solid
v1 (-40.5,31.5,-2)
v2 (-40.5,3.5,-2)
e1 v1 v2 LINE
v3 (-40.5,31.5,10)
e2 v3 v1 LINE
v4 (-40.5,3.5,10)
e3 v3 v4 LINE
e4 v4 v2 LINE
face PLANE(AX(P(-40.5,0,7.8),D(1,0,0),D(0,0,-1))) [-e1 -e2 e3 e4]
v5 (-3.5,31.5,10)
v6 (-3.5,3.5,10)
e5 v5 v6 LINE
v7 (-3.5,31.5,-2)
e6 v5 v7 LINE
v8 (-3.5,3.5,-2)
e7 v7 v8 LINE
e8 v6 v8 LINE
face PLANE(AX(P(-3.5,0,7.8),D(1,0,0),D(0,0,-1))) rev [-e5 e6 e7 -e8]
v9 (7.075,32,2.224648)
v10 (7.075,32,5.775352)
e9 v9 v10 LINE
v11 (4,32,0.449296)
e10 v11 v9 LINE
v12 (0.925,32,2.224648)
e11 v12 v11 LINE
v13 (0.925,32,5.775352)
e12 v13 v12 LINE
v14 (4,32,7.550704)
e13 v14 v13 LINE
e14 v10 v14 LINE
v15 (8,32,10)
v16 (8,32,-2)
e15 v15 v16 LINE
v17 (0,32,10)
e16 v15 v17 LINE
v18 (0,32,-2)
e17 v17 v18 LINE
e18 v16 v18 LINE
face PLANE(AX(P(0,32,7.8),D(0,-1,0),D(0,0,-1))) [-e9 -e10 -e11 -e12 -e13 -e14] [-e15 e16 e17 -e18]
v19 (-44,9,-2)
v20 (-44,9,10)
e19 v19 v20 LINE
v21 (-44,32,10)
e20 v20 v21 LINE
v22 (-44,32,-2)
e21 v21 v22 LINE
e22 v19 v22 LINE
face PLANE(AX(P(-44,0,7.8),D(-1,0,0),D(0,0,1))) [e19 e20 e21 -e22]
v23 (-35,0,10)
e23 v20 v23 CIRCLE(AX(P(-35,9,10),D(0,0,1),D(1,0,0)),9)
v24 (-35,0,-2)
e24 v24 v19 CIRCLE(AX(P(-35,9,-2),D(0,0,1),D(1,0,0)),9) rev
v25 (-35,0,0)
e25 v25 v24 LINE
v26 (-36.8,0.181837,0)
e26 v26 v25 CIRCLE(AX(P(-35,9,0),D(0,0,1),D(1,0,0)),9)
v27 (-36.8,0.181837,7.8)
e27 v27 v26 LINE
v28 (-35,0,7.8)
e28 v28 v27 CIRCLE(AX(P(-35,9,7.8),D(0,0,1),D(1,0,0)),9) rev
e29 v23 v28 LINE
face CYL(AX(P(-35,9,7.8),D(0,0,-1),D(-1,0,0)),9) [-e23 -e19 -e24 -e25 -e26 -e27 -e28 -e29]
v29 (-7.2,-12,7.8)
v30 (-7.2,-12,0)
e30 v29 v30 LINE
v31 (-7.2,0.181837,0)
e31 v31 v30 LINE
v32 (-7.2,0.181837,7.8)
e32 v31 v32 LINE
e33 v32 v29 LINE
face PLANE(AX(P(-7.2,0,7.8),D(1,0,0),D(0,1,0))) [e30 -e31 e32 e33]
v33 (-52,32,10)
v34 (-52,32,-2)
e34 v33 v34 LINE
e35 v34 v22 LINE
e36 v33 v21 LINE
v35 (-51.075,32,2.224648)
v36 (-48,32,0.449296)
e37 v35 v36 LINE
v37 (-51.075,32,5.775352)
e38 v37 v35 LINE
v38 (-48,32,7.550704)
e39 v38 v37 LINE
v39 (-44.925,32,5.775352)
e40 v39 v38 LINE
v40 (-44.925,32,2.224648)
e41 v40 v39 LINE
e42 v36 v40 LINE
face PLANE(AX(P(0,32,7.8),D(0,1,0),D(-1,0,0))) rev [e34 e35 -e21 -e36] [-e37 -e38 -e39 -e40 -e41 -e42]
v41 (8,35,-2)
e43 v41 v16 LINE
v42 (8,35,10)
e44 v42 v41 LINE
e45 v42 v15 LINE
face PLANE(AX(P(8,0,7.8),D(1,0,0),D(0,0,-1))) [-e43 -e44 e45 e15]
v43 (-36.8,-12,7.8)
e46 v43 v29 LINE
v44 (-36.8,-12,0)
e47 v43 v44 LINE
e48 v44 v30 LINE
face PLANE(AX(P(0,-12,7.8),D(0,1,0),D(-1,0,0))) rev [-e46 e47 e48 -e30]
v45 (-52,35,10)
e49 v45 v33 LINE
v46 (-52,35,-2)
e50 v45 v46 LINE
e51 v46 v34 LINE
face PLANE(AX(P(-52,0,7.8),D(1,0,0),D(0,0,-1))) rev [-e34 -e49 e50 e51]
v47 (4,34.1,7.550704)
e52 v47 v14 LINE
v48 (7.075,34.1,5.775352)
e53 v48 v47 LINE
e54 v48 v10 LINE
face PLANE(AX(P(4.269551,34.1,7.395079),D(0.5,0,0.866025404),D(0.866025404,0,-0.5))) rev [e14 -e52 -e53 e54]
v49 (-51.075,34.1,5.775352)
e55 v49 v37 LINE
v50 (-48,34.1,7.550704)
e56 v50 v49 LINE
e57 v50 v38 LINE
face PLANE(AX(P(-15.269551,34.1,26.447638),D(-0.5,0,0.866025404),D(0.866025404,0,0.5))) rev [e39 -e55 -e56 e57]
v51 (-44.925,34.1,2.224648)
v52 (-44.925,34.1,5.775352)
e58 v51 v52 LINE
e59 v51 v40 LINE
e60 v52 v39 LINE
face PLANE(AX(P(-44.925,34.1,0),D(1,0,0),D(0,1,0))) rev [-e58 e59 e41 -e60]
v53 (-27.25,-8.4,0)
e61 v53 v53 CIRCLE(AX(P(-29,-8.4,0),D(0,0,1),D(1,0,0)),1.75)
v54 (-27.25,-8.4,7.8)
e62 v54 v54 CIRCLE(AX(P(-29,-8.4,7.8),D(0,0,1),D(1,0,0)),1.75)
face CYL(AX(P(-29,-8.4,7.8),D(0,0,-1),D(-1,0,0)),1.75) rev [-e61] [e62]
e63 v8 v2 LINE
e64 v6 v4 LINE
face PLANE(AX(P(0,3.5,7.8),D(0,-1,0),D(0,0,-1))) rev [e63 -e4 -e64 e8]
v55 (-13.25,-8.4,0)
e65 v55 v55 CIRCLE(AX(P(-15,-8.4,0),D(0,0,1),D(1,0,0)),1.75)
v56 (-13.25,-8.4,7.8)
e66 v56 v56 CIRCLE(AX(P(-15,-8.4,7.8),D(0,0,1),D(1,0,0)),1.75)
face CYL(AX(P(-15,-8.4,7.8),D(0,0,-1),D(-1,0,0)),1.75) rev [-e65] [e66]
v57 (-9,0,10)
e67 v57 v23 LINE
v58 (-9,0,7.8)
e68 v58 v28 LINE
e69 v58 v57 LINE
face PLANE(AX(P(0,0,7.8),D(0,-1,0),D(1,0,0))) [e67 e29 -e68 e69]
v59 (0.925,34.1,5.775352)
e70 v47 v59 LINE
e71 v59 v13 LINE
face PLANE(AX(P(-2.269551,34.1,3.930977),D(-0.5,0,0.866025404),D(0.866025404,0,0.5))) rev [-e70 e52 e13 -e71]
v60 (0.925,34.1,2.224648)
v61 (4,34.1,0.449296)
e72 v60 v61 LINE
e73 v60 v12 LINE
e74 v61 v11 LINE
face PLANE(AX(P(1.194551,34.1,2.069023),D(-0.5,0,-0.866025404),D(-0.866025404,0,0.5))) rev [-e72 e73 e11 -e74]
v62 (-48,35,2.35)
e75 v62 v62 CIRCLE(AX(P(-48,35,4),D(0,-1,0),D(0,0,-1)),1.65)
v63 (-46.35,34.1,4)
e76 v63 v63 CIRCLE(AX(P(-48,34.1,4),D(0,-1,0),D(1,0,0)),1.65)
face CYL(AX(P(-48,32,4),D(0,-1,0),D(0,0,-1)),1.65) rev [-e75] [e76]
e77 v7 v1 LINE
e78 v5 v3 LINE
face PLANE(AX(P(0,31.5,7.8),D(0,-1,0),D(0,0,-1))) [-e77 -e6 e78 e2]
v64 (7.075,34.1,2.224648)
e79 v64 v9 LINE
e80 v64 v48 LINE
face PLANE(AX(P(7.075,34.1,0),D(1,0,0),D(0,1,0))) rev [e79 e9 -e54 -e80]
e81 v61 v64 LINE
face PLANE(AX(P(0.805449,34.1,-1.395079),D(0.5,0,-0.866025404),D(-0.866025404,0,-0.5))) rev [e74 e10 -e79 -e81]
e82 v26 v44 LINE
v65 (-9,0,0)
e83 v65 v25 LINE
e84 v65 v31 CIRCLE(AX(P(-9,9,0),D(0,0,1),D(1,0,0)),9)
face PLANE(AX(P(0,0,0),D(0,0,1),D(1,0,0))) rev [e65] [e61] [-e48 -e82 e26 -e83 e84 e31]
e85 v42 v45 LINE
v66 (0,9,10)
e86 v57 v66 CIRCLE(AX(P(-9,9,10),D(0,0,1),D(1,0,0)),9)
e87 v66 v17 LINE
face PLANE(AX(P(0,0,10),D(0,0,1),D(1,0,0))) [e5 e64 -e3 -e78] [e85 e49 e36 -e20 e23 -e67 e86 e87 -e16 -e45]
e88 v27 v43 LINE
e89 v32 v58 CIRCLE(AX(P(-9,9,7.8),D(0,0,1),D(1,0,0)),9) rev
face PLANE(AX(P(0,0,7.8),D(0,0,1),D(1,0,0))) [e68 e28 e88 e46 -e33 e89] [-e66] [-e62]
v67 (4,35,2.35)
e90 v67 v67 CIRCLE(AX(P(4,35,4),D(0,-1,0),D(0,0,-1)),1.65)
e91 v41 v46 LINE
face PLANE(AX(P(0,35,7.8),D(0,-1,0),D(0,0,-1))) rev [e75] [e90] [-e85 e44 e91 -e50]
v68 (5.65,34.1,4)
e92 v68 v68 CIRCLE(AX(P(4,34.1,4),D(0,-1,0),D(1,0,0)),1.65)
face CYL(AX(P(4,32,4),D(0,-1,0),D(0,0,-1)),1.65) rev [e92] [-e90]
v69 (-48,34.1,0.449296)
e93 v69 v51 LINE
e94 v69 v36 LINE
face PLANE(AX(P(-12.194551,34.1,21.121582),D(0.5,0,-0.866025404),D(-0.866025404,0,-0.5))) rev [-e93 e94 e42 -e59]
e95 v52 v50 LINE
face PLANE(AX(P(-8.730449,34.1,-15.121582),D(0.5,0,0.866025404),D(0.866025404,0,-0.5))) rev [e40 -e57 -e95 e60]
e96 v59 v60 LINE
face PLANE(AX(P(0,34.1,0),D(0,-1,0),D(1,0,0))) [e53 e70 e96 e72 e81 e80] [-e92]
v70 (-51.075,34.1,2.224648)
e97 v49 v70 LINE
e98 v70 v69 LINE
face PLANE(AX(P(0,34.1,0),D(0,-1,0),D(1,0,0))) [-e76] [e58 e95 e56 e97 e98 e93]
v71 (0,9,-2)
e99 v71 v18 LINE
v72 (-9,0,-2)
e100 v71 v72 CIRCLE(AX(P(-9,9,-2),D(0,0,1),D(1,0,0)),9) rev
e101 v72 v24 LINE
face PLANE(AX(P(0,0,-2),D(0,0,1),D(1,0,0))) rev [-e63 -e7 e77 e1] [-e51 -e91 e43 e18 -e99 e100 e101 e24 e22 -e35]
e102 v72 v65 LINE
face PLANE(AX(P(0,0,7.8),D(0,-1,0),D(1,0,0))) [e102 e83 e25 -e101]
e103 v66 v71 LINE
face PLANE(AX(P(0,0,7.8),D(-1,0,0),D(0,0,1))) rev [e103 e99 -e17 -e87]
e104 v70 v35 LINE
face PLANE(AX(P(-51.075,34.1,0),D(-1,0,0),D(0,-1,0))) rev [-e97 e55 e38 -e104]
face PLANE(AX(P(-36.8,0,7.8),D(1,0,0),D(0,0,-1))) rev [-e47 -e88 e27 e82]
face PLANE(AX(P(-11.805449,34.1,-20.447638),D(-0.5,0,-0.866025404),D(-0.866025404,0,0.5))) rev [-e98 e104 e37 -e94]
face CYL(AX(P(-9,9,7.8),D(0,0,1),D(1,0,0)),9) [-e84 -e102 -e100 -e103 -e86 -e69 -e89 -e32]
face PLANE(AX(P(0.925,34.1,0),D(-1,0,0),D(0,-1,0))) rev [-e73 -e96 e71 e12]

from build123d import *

# Parameters (mm, degrees)
SKETCH1_W                = 37
SKETCH1_H                = 28
SKETCH1_R                = 1.75
BOSS_EXTRUDE1_DEPTH      = 7.8
BOSS_EXTRUDE2_DEPTH      = 10
BOSS_EXTRUDE2_DEPTH_BACK = 2
SKETCH1_3_W              = 44
SKETCH1_3_H              = 35
SKETCH1_3_W_2            = 37
SKETCH1_3_H_2            = 28
SKETCH1_3_W_3            = 8
SKETCH1_3_H_3            = 3
FILLET1_R                = 9
CUT_EXTRUDE1_DEPTH       = 2.1
HOLE1_D                  = 3.3


with BuildPart() as part:
    # Sketch1 → Boss-Extrude1 (new body)
    with BuildSketch(Plane.XY):
        Polygon((-7.2, 0), (0, 0), (0, 32), (8, 32), (8, 35), (-52, 35), (-52, 32), (-44, 32), (-44, 0), (-36.8, 0), (-36.8, -12), (-7.2, -12), align=None)
        with Locations((-22, 17.5)):
            Rectangle(SKETCH1_W, SKETCH1_H, mode=Mode.SUBTRACT)
        with Locations((-15, -8.4)):
            Circle(SKETCH1_R, mode=Mode.SUBTRACT)
        with Locations((-29, -8.4)):
            Circle(SKETCH1_R, mode=Mode.SUBTRACT)
    extrude(amount=BOSS_EXTRUDE1_DEPTH)

    # Sketch1<3> → Boss-Extrude2 (add, two sides: drawn at the far end of the back side and taken through both)
    # profile 1 of 3: a face of its own
    with BuildSketch(Plane.XY.offset(-BOSS_EXTRUDE2_DEPTH_BACK)):
        with Locations((-22, 17.5)):
            Rectangle(SKETCH1_3_W, SKETCH1_3_H)
        with Locations((-22, 17.5)):
            Rectangle(SKETCH1_3_W_2, SKETCH1_3_H_2, mode=Mode.SUBTRACT)
    # profile 2 of 3: a face of its own
    with BuildSketch(Plane.XY.offset(-BOSS_EXTRUDE2_DEPTH_BACK)):
        with Locations((4, 33.5)):
            Rectangle(SKETCH1_3_W_3, SKETCH1_3_H_3)
    # profile 3 of 3: a face of its own
    with BuildSketch(Plane.XY.offset(-BOSS_EXTRUDE2_DEPTH_BACK)):
        with Locations((-48, 33.5)):
            Rectangle(SKETCH1_3_W_3, SKETCH1_3_H_3)
    extrude(amount=BOSS_EXTRUDE2_DEPTH + BOSS_EXTRUDE2_DEPTH_BACK)

    # Fillet1
    # the kernel refuses this fillet: 9 mm, written as the material it takes off along each edge
    with BuildSketch(Plane(origin=(0, 0, -24.5), x_dir=(-1, 0, 0), z_dir=(0, 0, 1))) as fillet1_piece_1_section:
        with BuildLine():
            CenterArc((FILLET1_R, -FILLET1_R), FILLET1_R, 90, 90)
            Line((0, -FILLET1_R), (0, 0))
            Line((0, 0), (FILLET1_R, 0))
        make_face()
    fillet1_piece_1 = extrude(amount=57, mode=Mode.PRIVATE)
    fillet1_piece_1 = split(fillet1_piece_1, bisect_by=Plane(origin=(-7.2, -0.053721548, -12.25), z_dir=(-1, 0, 0)), keep=Keep.TOP, mode=Mode.PRIVATE)
    fillet1_piece_1 = split(fillet1_piece_1, bisect_by=Plane(origin=(-7.986757567, -0.053721548, 0), z_dir=(0, 0, -1)), keep=Keep.TOP, mode=Mode.PRIVATE)
    add(fillet1_piece_1, mode=Mode.SUBTRACT)
    with BuildSketch(Plane(origin=(0, 0, -24.5), x_dir=(-1, 0, 0), z_dir=(0, 0, 1))) as fillet1_piece_2_section:
        with BuildLine():
            CenterArc((FILLET1_R, -FILLET1_R), FILLET1_R, 90, 90)
            Line((0, -FILLET1_R), (0, 0))
            Line((0, 0), (FILLET1_R, 0))
        make_face()
    fillet1_piece_2 = extrude(amount=57, mode=Mode.PRIVATE)
    fillet1_piece_2 = split(fillet1_piece_2, bisect_by=Plane(origin=(-7.2, 2.082298627, -12.25), z_dir=(1, 0, 0)), keep=Keep.TOP, mode=Mode.PRIVATE)
    fillet1_piece_2 = split(fillet1_piece_2, bisect_by=Plane(origin=(-1.910273674, 2.082298627, 0), z_dir=(0, 0, -1)), keep=Keep.TOP, mode=Mode.PRIVATE)
    add(fillet1_piece_2, mode=Mode.SUBTRACT)
    with BuildSketch(Plane(origin=(0, 0, -24.5), x_dir=(-1, 0, 0), z_dir=(0, 0, 1))) as fillet1_piece_3_section:
        with BuildLine():
            CenterArc((FILLET1_R, -FILLET1_R), FILLET1_R, 90, 90)
            Line((0, -FILLET1_R), (0, 0))
            Line((0, 0), (FILLET1_R, 0))
        make_face()
    fillet1_piece_3 = extrude(amount=57, mode=Mode.PRIVATE)
    fillet1_piece_3 = split(fillet1_piece_3, bisect_by=Plane(origin=(-7.2, 2.082298627, 3.9), z_dir=(1, 0, 0)), keep=Keep.TOP, mode=Mode.PRIVATE)
    fillet1_piece_3 = split(fillet1_piece_3, bisect_by=Plane(origin=(-1.910273674, 2.082298627, 7.8), z_dir=(0, 0, -1)), keep=Keep.TOP, mode=Mode.PRIVATE)
    fillet1_piece_3 = split(fillet1_piece_3, bisect_by=Plane(origin=(-1.910273674, 2.082298627, 0), z_dir=(0, 0, 1)), keep=Keep.TOP, mode=Mode.PRIVATE)
    add(fillet1_piece_3, mode=Mode.SUBTRACT)
    with BuildSketch(Plane(origin=(0, 0, -24.5), x_dir=(-1, 0, 0), z_dir=(0, 0, 1))) as fillet1_piece_4_section:
        with BuildLine():
            CenterArc((FILLET1_R, -FILLET1_R), FILLET1_R, 90, 90)
            Line((0, -FILLET1_R), (0, 0))
            Line((0, 0), (FILLET1_R, 0))
        make_face()
    fillet1_piece_4 = extrude(amount=57, mode=Mode.PRIVATE)
    fillet1_piece_4 = split(fillet1_piece_4, bisect_by=Plane(origin=(-7.2, -0.053721548, 20.15), z_dir=(-1, 0, 0)), keep=Keep.TOP, mode=Mode.PRIVATE)
    fillet1_piece_4 = split(fillet1_piece_4, bisect_by=Plane(origin=(-7.986757567, -0.053721548, 7.8), z_dir=(0, 0, 1)), keep=Keep.TOP, mode=Mode.PRIVATE)
    add(fillet1_piece_4, mode=Mode.SUBTRACT)
    with BuildSketch(Plane(origin=(0, 0, -24.5), x_dir=(-1, 0, 0), z_dir=(0, 0, 1))) as fillet1_piece_5_section:
        with BuildLine():
            CenterArc((FILLET1_R, -FILLET1_R), FILLET1_R, 90, 90)
            Line((0, -FILLET1_R), (0, 0))
            Line((0, 0), (FILLET1_R, 0))
        make_face()
    fillet1_piece_5 = extrude(amount=57, mode=Mode.PRIVATE)
    fillet1_piece_5 = split(fillet1_piece_5, bisect_by=Plane(origin=(-7.2, 2.082298627, 20.15), z_dir=(1, 0, 0)), keep=Keep.TOP, mode=Mode.PRIVATE)
    fillet1_piece_5 = split(fillet1_piece_5, bisect_by=Plane(origin=(-1.910273674, 2.082298627, 7.8), z_dir=(0, 0, 1)), keep=Keep.TOP, mode=Mode.PRIVATE)
    add(fillet1_piece_5, mode=Mode.SUBTRACT)
    with BuildSketch(Plane(origin=(-44, 0, 32.5), x_dir=(1, 0, 0), z_dir=(0, 0, -1))) as fillet1_piece_6_section:
        with BuildLine():
            CenterArc((FILLET1_R, -FILLET1_R), FILLET1_R, 90, 90)
            Line((0, -FILLET1_R), (0, 0))
            Line((0, 0), (FILLET1_R, 0))
        make_face()
    fillet1_piece_6 = extrude(amount=57, mode=Mode.PRIVATE)
    fillet1_piece_6 = split(fillet1_piece_6, bisect_by=Plane(origin=(-36.013242433, -0.053721548, 7.8), z_dir=(0, 0, 1)), keep=Keep.TOP, mode=Mode.PRIVATE)
    fillet1_piece_6 = split(fillet1_piece_6, bisect_by=Plane(origin=(-36.8, -0.053721548, 20.15), z_dir=(1, 0, 0)), keep=Keep.TOP, mode=Mode.PRIVATE)
    add(fillet1_piece_6, mode=Mode.SUBTRACT)
    with BuildSketch(Plane(origin=(-44, 0, 32.5), x_dir=(1, 0, 0), z_dir=(0, 0, -1))) as fillet1_piece_7_section:
        with BuildLine():
            CenterArc((FILLET1_R, -FILLET1_R), FILLET1_R, 90, 90)
            Line((0, -FILLET1_R), (0, 0))
            Line((0, 0), (FILLET1_R, 0))
        make_face()
    fillet1_piece_7 = extrude(amount=57, mode=Mode.PRIVATE)
    fillet1_piece_7 = split(fillet1_piece_7, bisect_by=Plane(origin=(-42.089726326, 2.082298627, 7.8), z_dir=(0, 0, 1)), keep=Keep.TOP, mode=Mode.PRIVATE)
    fillet1_piece_7 = split(fillet1_piece_7, bisect_by=Plane(origin=(-36.8, 2.082298627, 20.15), z_dir=(-1, 0, 0)), keep=Keep.TOP, mode=Mode.PRIVATE)
    add(fillet1_piece_7, mode=Mode.SUBTRACT)
    with BuildSketch(Plane(origin=(-44, 0, 32.5), x_dir=(1, 0, 0), z_dir=(0, 0, -1))) as fillet1_piece_8_section:
        with BuildLine():
            CenterArc((FILLET1_R, -FILLET1_R), FILLET1_R, 90, 90)
            Line((0, -FILLET1_R), (0, 0))
            Line((0, 0), (FILLET1_R, 0))
        make_face()
    fillet1_piece_8 = extrude(amount=57, mode=Mode.PRIVATE)
    fillet1_piece_8 = split(fillet1_piece_8, bisect_by=Plane(origin=(-42.089726326, 2.082298627, 7.8), z_dir=(0, 0, -1)), keep=Keep.TOP, mode=Mode.PRIVATE)
    fillet1_piece_8 = split(fillet1_piece_8, bisect_by=Plane(origin=(-36.8, 2.082298627, 3.9), z_dir=(-1, 0, 0)), keep=Keep.TOP, mode=Mode.PRIVATE)
    fillet1_piece_8 = split(fillet1_piece_8, bisect_by=Plane(origin=(-42.089726326, 2.082298627, 0), z_dir=(0, 0, 1)), keep=Keep.TOP, mode=Mode.PRIVATE)
    add(fillet1_piece_8, mode=Mode.SUBTRACT)
    with BuildSketch(Plane(origin=(-44, 0, 32.5), x_dir=(1, 0, 0), z_dir=(0, 0, -1))) as fillet1_piece_9_section:
        with BuildLine():
            CenterArc((FILLET1_R, -FILLET1_R), FILLET1_R, 90, 90)
            Line((0, -FILLET1_R), (0, 0))
            Line((0, 0), (FILLET1_R, 0))
        make_face()
    fillet1_piece_9 = extrude(amount=57, mode=Mode.PRIVATE)
    fillet1_piece_9 = split(fillet1_piece_9, bisect_by=Plane(origin=(-36.8, -0.053721548, -12.25), z_dir=(1, 0, 0)), keep=Keep.TOP, mode=Mode.PRIVATE)
    fillet1_piece_9 = split(fillet1_piece_9, bisect_by=Plane(origin=(-36.013242433, -0.053721548, 0), z_dir=(0, 0, -1)), keep=Keep.TOP, mode=Mode.PRIVATE)
    add(fillet1_piece_9, mode=Mode.SUBTRACT)
    with BuildSketch(Plane(origin=(-44, 0, 32.5), x_dir=(1, 0, 0), z_dir=(0, 0, -1))) as fillet1_piece_10_section:
        with BuildLine():
            CenterArc((FILLET1_R, -FILLET1_R), FILLET1_R, 90, 90)
            Line((0, -FILLET1_R), (0, 0))
            Line((0, 0), (FILLET1_R, 0))
        make_face()
    fillet1_piece_10 = extrude(amount=57, mode=Mode.PRIVATE)
    fillet1_piece_10 = split(fillet1_piece_10, bisect_by=Plane(origin=(-36.8, 2.082298627, -12.25), z_dir=(-1, 0, 0)), keep=Keep.TOP, mode=Mode.PRIVATE)
    fillet1_piece_10 = split(fillet1_piece_10, bisect_by=Plane(origin=(-42.089726326, 2.082298627, 0), z_dir=(0, 0, -1)), keep=Keep.TOP, mode=Mode.PRIVATE)
    add(fillet1_piece_10, mode=Mode.SUBTRACT)

    # Sketch2 → Cut-Extrude1 (cut)
    with BuildSketch(Plane.XZ.offset(-32)):
        Polygon((-48, 0.449295844), (-44.925, 2.224647922), (-44.925, 5.775352078), (-48, 7.550704156), (-51.075, 5.775352078), (-51.075, 2.224647922), align=None)
        Polygon((0.925, 5.775352078), (0.925, 2.224647922), (4, 0.449295844), (7.075, 2.224647922), (7.075, 5.775352078), (4, 7.550704156), align=None)
    extrude(amount=-CUT_EXTRUDE1_DEPTH, mode=Mode.SUBTRACT)

    # Hole1 (through all)
    with Locations(Plane(origin=(-48, 32, 4), x_dir=(-1, 0, 0), z_dir=(0, -1, 0))):
        with Locations((0, 0), (-52, 0)):
            Hole(HOLE1_D / 2)


solid = part.part
